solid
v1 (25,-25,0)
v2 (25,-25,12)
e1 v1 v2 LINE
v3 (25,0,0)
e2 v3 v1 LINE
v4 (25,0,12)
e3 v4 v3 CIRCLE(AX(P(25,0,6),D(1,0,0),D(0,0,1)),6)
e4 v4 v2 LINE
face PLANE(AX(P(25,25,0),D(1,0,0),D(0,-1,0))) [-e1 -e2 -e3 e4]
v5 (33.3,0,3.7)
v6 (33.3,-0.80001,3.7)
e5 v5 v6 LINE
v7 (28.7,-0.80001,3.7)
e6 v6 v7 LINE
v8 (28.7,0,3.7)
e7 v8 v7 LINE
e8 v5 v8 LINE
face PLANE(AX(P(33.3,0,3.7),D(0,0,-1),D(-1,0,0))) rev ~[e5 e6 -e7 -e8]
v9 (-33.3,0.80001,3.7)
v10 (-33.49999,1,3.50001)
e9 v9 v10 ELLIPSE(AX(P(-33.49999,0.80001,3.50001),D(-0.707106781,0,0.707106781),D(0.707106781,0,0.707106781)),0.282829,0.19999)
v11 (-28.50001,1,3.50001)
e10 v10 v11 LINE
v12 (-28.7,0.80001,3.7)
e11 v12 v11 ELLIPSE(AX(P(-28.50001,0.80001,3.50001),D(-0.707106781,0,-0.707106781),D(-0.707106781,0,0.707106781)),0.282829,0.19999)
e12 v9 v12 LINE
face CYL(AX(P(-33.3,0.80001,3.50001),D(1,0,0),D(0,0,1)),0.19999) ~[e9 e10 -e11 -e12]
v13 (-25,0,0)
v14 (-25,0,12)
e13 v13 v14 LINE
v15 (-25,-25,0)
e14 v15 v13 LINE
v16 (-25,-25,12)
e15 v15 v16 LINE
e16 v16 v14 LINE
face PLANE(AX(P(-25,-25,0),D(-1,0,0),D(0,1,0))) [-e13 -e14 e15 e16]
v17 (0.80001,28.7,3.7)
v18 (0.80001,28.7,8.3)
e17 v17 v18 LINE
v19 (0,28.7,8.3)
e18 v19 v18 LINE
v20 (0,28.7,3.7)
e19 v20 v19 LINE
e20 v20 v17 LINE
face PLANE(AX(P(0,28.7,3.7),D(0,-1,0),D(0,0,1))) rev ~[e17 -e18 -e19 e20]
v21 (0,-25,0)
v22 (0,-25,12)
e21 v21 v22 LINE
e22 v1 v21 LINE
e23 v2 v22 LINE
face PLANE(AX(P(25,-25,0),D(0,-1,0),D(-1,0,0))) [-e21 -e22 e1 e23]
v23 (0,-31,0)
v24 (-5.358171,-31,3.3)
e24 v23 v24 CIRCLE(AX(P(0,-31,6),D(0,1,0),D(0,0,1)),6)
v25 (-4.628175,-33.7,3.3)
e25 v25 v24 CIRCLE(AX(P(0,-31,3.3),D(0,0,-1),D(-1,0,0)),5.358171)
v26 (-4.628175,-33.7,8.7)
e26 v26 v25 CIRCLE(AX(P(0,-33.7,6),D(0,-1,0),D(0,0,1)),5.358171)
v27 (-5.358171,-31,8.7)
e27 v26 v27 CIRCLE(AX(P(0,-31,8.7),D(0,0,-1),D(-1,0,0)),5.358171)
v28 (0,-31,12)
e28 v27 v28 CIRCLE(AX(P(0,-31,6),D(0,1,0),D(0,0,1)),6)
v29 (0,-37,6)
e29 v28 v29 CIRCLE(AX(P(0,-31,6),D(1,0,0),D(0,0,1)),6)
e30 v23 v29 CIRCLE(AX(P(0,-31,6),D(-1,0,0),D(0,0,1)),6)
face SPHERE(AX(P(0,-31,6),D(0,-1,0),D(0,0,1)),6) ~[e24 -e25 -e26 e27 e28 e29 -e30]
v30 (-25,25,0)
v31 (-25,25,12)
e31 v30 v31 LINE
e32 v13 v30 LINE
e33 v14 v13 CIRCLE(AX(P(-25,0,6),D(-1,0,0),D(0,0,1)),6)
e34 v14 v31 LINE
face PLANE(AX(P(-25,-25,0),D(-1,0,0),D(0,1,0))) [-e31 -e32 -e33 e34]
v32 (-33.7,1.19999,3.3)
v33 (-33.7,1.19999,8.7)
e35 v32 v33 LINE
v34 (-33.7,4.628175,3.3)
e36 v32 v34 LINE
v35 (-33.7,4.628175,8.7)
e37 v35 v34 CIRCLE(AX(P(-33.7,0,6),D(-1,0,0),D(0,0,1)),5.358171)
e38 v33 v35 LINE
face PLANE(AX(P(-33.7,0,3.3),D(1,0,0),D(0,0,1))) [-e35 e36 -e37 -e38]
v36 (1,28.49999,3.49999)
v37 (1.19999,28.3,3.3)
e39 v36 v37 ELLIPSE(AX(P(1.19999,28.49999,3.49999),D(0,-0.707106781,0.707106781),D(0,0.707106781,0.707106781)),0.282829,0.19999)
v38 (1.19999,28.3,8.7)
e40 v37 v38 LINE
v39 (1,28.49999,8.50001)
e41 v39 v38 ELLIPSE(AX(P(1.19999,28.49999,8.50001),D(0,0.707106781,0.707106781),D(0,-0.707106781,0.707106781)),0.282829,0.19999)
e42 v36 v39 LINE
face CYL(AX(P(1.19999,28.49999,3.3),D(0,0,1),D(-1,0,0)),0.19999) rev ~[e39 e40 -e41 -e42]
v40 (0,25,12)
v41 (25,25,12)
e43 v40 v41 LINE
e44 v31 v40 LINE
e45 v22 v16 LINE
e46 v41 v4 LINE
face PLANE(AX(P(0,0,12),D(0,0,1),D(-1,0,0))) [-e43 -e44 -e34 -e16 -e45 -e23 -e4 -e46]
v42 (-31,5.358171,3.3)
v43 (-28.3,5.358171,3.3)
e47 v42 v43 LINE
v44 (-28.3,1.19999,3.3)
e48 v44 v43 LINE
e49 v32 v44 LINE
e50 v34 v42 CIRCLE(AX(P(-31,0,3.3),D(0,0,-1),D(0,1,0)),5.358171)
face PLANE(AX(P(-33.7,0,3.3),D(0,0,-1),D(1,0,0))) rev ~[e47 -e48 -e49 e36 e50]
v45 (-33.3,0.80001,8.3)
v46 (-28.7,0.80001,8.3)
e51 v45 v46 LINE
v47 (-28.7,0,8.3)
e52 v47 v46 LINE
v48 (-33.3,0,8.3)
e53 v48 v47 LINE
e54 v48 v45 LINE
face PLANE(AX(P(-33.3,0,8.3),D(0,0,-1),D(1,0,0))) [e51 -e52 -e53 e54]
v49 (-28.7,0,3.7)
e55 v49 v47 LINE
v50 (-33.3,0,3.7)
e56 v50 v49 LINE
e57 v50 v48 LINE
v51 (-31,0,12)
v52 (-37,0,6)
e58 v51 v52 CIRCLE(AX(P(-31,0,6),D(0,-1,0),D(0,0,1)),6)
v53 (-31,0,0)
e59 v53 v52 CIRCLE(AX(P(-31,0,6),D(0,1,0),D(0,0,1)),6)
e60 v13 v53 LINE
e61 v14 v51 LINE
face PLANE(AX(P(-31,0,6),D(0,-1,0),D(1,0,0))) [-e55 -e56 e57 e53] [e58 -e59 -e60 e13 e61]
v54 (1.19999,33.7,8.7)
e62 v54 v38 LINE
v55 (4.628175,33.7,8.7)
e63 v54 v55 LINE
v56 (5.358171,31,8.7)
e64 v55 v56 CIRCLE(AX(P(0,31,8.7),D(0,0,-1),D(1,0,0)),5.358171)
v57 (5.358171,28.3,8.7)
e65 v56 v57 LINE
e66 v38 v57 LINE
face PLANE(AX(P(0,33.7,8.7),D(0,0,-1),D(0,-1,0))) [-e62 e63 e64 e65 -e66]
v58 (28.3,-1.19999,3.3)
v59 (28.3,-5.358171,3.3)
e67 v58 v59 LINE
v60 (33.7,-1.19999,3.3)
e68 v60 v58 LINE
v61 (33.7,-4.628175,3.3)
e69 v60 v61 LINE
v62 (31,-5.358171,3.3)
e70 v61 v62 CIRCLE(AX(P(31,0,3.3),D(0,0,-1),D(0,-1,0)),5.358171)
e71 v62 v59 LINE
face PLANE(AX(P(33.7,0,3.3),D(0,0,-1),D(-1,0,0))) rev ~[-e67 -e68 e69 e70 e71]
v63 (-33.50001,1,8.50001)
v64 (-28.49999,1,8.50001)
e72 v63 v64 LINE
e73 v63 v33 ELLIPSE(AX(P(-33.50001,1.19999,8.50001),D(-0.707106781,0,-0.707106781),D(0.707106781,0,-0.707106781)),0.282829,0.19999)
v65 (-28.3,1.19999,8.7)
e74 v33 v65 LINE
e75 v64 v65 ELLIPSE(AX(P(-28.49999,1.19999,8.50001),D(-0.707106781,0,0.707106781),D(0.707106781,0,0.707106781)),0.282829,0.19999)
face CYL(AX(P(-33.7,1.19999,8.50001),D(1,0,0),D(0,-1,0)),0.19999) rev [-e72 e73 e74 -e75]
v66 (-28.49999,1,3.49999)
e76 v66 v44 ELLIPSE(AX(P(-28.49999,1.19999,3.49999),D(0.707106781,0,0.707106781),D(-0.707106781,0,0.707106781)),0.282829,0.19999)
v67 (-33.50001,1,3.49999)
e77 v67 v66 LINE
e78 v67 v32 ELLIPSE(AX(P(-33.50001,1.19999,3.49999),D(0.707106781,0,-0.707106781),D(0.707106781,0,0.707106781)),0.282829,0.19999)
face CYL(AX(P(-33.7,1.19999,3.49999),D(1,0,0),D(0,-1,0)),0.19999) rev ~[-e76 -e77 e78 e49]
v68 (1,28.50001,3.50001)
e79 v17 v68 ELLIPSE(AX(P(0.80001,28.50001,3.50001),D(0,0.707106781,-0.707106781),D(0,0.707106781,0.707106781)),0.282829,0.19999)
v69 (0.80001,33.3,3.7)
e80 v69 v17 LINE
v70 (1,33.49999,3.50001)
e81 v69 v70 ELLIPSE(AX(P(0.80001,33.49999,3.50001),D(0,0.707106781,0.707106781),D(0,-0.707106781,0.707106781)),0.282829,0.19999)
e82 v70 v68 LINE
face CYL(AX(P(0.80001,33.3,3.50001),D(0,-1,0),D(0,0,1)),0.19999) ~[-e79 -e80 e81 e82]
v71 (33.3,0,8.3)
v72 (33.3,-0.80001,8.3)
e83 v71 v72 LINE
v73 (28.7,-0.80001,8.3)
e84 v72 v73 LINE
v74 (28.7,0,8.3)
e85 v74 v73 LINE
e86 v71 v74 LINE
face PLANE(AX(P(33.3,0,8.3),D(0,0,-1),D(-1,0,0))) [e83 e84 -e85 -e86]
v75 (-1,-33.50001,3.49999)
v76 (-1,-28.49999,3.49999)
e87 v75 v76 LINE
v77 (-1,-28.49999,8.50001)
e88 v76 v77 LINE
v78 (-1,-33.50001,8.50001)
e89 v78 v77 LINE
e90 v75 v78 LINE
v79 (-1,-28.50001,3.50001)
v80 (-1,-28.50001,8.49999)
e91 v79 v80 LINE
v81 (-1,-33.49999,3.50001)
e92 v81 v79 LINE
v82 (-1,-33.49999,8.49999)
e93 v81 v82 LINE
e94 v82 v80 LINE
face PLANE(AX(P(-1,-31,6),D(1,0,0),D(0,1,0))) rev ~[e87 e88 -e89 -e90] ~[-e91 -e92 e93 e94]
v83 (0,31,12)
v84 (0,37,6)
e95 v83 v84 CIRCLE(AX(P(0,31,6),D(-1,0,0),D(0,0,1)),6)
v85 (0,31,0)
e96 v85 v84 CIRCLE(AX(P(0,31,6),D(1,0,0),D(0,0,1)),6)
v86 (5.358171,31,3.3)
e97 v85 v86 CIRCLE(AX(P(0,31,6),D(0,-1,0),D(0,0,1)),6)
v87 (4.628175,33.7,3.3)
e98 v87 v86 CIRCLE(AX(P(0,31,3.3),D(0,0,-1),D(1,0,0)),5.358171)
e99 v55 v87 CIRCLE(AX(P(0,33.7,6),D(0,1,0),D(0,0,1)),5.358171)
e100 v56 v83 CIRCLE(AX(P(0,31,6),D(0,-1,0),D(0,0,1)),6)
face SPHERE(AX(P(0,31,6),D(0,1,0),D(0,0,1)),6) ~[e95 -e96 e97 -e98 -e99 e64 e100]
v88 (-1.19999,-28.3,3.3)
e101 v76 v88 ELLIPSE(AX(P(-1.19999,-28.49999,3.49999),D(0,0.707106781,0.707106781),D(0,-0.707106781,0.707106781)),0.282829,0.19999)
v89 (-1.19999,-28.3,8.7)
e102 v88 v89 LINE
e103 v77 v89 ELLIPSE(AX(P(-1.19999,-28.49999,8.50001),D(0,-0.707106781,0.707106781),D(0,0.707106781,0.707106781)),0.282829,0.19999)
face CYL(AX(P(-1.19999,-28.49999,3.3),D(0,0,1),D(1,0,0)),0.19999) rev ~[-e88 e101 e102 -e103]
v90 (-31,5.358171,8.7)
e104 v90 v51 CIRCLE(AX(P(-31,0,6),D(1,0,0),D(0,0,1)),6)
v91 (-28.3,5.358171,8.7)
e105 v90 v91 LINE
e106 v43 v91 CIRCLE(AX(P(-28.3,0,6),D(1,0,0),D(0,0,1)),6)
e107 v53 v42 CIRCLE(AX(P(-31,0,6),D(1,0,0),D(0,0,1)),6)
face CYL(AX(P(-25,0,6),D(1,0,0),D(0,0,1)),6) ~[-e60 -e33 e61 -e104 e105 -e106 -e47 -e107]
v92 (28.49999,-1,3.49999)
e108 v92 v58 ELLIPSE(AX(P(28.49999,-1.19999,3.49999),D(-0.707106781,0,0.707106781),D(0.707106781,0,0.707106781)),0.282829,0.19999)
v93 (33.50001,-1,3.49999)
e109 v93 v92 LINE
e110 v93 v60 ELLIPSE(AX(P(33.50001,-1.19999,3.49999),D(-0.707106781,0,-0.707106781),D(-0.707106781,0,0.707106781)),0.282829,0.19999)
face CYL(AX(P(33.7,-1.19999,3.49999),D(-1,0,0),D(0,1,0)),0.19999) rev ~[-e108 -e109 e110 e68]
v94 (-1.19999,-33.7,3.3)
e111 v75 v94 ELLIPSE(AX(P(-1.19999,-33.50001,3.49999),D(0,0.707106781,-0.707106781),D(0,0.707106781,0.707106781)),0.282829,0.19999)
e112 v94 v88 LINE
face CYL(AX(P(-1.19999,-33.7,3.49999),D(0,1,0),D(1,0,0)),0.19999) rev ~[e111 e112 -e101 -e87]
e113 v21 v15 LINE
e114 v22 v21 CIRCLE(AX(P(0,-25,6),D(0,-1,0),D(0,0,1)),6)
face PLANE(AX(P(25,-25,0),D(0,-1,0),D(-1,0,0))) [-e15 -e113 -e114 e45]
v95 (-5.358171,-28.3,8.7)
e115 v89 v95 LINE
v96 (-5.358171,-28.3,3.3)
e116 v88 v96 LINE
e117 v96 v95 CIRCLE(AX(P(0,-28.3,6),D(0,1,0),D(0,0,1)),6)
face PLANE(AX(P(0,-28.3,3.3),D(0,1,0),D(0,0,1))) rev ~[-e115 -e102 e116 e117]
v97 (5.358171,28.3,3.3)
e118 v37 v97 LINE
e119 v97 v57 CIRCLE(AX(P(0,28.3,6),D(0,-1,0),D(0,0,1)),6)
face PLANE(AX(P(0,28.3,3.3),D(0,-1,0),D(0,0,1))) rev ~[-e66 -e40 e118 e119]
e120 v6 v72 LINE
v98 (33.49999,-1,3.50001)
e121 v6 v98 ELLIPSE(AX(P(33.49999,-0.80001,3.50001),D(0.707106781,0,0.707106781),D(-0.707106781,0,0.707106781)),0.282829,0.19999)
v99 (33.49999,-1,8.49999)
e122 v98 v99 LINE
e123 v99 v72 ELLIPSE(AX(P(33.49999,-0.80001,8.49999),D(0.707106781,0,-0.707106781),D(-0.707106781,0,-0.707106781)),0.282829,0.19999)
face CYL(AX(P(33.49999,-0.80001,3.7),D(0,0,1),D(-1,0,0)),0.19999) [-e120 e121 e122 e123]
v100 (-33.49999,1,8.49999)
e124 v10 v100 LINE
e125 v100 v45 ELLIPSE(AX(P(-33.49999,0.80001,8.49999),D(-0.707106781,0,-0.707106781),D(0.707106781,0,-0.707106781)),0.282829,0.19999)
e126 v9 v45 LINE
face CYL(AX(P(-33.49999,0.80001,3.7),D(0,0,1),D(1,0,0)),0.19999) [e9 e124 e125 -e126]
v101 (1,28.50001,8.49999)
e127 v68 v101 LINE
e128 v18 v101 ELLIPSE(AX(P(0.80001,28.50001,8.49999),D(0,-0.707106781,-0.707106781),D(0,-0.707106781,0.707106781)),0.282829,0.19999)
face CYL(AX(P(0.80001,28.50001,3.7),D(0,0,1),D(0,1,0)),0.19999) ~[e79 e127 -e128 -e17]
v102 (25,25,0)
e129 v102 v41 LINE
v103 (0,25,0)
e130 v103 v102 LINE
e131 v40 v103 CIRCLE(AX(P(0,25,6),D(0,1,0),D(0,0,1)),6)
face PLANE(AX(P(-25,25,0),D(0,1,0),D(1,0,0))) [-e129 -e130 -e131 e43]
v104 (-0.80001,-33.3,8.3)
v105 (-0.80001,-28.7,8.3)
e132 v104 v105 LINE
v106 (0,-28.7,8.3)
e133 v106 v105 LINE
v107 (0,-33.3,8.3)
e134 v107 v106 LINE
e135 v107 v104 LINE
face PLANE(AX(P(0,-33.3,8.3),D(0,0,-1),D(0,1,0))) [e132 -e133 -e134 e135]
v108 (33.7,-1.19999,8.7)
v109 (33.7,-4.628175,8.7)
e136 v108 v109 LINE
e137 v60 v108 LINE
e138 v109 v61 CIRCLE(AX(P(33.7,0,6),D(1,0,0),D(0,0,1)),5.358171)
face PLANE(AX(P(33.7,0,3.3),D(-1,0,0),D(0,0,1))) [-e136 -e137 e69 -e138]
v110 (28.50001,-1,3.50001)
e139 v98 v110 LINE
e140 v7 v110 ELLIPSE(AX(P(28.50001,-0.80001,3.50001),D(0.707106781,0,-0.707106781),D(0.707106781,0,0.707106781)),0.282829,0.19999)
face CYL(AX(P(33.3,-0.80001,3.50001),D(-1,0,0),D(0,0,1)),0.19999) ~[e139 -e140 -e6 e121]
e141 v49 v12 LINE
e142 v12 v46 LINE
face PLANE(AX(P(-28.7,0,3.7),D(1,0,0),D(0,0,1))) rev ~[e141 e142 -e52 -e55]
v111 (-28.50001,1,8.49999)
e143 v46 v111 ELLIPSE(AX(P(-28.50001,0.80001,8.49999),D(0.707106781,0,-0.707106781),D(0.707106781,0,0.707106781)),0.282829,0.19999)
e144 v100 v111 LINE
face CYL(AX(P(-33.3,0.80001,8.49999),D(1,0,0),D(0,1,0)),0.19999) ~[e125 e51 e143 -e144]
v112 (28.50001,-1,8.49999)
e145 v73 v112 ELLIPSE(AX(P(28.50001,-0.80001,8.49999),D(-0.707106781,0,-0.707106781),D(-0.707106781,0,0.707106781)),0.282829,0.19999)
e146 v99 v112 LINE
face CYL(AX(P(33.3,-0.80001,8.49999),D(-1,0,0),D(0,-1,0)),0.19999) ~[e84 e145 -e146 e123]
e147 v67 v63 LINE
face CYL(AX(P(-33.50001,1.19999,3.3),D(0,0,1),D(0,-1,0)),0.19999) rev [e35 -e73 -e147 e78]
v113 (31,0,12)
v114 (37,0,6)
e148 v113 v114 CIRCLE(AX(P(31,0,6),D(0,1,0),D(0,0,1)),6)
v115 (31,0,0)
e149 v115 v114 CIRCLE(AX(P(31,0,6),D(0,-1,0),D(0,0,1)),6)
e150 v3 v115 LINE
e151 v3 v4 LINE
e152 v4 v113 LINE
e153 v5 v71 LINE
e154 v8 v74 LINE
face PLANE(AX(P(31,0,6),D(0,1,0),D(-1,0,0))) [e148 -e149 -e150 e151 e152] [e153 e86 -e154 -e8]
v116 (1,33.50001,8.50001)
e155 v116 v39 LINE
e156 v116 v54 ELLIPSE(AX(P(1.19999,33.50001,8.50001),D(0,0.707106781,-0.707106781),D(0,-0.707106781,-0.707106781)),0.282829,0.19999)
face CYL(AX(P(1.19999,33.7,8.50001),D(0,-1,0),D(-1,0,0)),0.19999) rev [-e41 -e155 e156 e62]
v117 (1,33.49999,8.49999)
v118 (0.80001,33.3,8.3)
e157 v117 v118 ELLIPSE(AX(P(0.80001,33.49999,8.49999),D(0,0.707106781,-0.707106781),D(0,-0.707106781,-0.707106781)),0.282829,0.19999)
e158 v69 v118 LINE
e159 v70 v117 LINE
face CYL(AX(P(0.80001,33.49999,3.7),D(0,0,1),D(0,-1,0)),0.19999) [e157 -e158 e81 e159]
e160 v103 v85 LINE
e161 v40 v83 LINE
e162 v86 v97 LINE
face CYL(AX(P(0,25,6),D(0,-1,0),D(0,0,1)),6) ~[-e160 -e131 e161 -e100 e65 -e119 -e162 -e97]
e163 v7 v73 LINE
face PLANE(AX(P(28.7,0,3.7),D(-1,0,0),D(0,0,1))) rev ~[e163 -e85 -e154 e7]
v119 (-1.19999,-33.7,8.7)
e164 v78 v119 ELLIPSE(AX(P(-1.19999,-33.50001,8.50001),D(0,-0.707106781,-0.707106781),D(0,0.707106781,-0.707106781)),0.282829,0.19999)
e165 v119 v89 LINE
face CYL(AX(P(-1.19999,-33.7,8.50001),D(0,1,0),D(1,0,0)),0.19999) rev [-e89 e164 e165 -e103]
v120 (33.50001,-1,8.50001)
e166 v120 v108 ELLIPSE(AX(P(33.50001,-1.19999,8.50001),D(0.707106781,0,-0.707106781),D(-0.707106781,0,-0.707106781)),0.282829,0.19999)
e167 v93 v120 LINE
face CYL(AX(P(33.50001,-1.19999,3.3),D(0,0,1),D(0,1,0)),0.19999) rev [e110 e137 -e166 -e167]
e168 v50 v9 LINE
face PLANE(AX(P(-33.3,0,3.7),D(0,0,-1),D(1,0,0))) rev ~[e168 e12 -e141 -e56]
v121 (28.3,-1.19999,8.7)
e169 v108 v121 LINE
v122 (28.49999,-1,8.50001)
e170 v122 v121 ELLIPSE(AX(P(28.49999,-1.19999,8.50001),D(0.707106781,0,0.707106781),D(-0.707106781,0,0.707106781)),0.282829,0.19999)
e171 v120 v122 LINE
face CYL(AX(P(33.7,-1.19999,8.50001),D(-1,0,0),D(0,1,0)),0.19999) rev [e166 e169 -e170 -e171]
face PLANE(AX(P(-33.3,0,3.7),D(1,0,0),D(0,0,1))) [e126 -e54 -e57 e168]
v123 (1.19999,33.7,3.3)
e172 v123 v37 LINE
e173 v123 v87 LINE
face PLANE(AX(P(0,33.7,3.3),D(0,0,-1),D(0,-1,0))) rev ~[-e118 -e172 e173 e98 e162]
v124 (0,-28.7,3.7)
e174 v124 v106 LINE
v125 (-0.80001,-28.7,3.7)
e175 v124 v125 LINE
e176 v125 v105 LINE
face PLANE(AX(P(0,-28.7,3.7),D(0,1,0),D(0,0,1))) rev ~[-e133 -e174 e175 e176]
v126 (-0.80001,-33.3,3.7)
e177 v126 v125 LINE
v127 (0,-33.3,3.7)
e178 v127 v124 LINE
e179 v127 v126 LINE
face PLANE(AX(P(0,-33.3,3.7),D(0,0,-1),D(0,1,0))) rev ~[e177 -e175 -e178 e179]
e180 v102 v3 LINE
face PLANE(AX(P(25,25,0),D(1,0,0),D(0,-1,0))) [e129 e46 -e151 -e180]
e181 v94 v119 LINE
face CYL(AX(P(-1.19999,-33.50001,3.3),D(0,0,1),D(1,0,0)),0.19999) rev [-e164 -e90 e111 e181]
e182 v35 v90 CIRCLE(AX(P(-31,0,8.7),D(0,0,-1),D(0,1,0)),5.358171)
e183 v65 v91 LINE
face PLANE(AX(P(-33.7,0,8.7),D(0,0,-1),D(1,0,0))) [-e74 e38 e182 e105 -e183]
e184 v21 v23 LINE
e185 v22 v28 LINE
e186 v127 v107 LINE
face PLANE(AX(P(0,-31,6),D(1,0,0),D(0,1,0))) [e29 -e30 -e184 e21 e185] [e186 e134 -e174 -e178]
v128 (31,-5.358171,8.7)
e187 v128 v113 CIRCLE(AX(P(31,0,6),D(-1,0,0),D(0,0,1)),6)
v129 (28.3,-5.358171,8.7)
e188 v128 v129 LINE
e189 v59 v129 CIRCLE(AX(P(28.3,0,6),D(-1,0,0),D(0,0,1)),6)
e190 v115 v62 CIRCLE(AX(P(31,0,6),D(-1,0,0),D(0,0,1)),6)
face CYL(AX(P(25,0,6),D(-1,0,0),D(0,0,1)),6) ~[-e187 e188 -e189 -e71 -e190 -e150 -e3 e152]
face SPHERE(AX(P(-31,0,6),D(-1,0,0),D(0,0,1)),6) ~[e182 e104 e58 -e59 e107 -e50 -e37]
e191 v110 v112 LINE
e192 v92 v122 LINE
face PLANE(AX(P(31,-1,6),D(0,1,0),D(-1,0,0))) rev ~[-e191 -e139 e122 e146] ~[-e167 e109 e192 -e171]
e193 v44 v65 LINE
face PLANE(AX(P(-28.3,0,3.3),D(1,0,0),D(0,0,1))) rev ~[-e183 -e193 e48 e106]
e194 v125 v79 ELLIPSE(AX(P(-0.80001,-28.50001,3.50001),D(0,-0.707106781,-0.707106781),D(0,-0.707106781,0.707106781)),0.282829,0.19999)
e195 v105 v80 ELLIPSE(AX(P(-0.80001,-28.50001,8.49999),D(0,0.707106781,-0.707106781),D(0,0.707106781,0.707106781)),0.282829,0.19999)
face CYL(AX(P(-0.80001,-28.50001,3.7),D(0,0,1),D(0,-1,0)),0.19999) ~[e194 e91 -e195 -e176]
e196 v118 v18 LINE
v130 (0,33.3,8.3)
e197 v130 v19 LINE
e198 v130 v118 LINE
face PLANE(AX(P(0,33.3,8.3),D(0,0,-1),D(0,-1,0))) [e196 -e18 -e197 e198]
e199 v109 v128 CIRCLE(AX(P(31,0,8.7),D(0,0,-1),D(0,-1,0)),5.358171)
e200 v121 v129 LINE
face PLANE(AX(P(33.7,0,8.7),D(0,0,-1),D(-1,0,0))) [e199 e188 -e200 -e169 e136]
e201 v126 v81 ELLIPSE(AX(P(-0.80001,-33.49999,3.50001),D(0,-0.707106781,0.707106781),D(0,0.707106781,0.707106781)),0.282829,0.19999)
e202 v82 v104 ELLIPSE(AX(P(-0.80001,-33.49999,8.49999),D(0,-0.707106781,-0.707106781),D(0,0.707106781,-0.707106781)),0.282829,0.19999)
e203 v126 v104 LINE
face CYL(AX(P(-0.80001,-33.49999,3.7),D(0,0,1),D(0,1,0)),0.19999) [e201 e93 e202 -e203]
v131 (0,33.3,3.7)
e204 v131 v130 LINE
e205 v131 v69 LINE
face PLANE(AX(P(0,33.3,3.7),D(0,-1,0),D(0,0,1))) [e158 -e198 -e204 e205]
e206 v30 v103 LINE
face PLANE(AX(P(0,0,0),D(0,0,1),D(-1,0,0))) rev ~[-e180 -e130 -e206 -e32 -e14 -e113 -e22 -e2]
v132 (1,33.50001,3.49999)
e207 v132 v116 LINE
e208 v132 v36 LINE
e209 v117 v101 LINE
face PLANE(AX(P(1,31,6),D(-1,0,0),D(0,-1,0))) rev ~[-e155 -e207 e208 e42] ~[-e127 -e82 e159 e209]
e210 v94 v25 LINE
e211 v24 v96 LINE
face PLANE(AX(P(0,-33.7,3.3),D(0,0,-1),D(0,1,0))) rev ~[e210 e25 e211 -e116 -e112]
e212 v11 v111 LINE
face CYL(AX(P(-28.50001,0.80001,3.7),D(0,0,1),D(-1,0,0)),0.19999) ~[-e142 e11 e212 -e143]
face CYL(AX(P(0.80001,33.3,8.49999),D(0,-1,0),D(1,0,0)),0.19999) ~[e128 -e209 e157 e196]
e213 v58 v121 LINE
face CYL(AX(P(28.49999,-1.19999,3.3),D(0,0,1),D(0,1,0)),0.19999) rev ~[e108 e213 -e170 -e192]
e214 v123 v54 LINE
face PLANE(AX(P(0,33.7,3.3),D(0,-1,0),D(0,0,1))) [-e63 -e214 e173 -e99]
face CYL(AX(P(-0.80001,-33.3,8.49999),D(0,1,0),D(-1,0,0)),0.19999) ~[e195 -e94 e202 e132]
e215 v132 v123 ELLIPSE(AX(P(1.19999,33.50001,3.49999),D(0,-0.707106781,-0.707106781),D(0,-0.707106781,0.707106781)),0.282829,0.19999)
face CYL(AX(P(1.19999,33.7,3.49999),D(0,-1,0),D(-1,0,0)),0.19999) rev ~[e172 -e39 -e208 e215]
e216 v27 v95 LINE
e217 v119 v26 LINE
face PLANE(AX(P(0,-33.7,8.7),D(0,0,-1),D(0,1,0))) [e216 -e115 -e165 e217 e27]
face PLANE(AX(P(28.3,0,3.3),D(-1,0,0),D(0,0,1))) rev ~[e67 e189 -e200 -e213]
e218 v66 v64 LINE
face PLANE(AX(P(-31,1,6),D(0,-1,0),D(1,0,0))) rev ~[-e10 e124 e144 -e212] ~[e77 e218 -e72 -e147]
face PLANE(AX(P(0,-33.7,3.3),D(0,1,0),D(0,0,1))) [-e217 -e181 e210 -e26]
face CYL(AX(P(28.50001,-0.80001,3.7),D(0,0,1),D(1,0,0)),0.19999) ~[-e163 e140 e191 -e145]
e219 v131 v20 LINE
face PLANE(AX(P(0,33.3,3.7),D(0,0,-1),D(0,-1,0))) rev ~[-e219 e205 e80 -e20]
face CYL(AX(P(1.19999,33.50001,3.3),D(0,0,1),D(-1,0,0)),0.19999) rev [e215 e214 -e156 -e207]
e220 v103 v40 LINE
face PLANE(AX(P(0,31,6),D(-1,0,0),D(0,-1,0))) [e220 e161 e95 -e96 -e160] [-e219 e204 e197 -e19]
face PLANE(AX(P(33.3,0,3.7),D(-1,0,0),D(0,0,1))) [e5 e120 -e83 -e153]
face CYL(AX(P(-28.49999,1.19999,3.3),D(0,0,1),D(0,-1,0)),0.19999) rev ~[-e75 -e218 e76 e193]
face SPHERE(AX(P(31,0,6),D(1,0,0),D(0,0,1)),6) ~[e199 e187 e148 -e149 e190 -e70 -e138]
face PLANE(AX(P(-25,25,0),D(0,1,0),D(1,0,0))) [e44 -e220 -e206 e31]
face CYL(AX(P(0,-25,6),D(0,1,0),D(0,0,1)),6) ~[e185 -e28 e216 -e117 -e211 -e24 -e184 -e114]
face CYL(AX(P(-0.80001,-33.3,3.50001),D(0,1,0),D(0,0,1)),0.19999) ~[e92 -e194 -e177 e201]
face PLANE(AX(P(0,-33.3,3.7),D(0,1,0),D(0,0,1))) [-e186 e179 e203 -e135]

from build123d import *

# Parameters (mm, degrees)
F0_W      = 50
F0_H      = 50
F1_DEPTH  = 12
F3_DEPTH  = 12
F5_W      = 7.196964696
F5_H      = 12
F6_DEPTH  = 25
F7_W      = 5.4
F7_H      = 5.4
F8_DEPTH  = 25
F9_W      = 5.4
F9_H      = 5.4
F9_W_2    = 4.6
F9_H_2    = 4.6
F10_DEPTH = 1
F11_R     = 0.19999
F13_W     = 25
F13_H     = 12
F14_DEPTH = 50
F15_W     = 25
F15_H     = 12
F16_DEPTH = 25
F17_COUNT = 4


# Not quite as in the source:
# - a fillet or chamfer that OpenCascade refuses, or shapes differently, is made with other operations: its cross-section is extruded or revolved along the edge and cut away or added
# - a fillet or chamfer is up to 0.001 mm smaller than in the source, because OpenCascade refuses the exact size


with BuildPart() as f1:
    # F0 (on Top) → F1 (new body)
    with BuildSketch(Plane.XY):
        Rectangle(F0_W, F0_H)
    extrude(amount=F1_DEPTH)

    # F2 (on face) → F3 (join)
    with BuildSketch(Plane(origin=(-25, 0, 0), x_dir=(0, -1, 0), z_dir=(-1, 0, 0))):
        with BuildLine():
            ThreePointArc((0, 0), (4.2426406871, 1.7573593129), (6, 6))
            ThreePointArc((6, 6), (4.2426406871, 10.2426406871), (0, 12))
            ThreePointArc((0, 12), (-6, 6), (0, 0))
        make_face()
    extrude(amount=F3_DEPTH)

    # F4: fillet of radius 6 on 1 edges, made by hand

    # F4_s1 → F4_t2 (revolve, cut)
    with BuildSketch(Plane.XZ):
        with BuildLine():
            ThreePointArc((-31, 12), (-35.2426406871, 10.2426406871), (-37, 6))
            Line((-37, 6), (-37.12, 6))
            Line((-37.12, 6), (-37.12, 12.12))
            Line((-37.12, 12.12), (-31, 12.12))
            Line((-31, 12.12), (-31, 12))
        make_face()
    revolve(axis=Axis((-37, 0, 6), (1, 0, 0)), mode=Mode.SUBTRACT)

    # F5 (on face) → F6 (cut)
    with BuildSketch(Plane(origin=(-25, 0, 0), x_dir=(0, -1, 0), z_dir=(-1, 0, 0))):
        with Locations((3.598482348, 6)):
            Rectangle(F5_W, F5_H)
    extrude(amount=F6_DEPTH, mode=Mode.SUBTRACT)

    # F7 (on face) → F8 (cut)
    with BuildSketch(Plane.XZ):
        with Locations((-31, 6)):
            Rectangle(F7_W, F7_H)
    extrude(amount=-F8_DEPTH, mode=Mode.SUBTRACT)

    # F9 (on face) → F10 (join)
    with BuildSketch(Plane.XZ):
        with Locations((-31, 6)):
            Rectangle(F9_W, F9_H)
        with Locations((-31, 6)):
            Rectangle(F9_W_2, F9_H_2, mode=Mode.SUBTRACT)
    extrude(amount=-F10_DEPTH)

    # F11 (radius 0.2 in the source; OpenCascade refuses exactly that, so slightly less here)
    f11_edges = [f1.edges().sort_by_distance(p)[0] for p in [
        (-28.7, 1, 6),
        (-28.3, 1, 6),
        (-31, 1, 8.7),
        (-31, 1, 8.3),
        (-33.7, 1, 6),
        (-33.3, 1, 6),
        (-31, 1, 3.3),
        (-31, 1, 3.7),
    ]]
    fillet(f11_edges, radius=F11_R)

    # F13 (on face) → F14 (cut)
    with BuildSketch(Plane(origin=(-25, 0, 0), x_dir=(0, -1, 0), z_dir=(-1, 0, 0))):
        with Locations((12.5, 6)):
            Rectangle(F13_W, F13_H)
    extrude(amount=-F14_DEPTH, mode=Mode.SUBTRACT)

    # F15 (on face) → F16 (cut)
    with BuildSketch(Plane(origin=(0, 25, 0), x_dir=(-1, 0, 0), z_dir=(0, 1, 0))):
        with Locations((-12.5, 6)):
            Rectangle(F15_W, F15_H)
    extrude(amount=-F16_DEPTH, mode=Mode.SUBTRACT)

    # F17: F1 ×4 about axis
    f17_axis = Axis((0, 0, 13.6458836496), (0, 0, 1))


with BuildPart() as f1_1:
    add(f1.part)
    for i in range(1, F17_COUNT):
        add(f1.part.rotate(f17_axis, i * 360 / F17_COUNT))


solid = f1_1.part
